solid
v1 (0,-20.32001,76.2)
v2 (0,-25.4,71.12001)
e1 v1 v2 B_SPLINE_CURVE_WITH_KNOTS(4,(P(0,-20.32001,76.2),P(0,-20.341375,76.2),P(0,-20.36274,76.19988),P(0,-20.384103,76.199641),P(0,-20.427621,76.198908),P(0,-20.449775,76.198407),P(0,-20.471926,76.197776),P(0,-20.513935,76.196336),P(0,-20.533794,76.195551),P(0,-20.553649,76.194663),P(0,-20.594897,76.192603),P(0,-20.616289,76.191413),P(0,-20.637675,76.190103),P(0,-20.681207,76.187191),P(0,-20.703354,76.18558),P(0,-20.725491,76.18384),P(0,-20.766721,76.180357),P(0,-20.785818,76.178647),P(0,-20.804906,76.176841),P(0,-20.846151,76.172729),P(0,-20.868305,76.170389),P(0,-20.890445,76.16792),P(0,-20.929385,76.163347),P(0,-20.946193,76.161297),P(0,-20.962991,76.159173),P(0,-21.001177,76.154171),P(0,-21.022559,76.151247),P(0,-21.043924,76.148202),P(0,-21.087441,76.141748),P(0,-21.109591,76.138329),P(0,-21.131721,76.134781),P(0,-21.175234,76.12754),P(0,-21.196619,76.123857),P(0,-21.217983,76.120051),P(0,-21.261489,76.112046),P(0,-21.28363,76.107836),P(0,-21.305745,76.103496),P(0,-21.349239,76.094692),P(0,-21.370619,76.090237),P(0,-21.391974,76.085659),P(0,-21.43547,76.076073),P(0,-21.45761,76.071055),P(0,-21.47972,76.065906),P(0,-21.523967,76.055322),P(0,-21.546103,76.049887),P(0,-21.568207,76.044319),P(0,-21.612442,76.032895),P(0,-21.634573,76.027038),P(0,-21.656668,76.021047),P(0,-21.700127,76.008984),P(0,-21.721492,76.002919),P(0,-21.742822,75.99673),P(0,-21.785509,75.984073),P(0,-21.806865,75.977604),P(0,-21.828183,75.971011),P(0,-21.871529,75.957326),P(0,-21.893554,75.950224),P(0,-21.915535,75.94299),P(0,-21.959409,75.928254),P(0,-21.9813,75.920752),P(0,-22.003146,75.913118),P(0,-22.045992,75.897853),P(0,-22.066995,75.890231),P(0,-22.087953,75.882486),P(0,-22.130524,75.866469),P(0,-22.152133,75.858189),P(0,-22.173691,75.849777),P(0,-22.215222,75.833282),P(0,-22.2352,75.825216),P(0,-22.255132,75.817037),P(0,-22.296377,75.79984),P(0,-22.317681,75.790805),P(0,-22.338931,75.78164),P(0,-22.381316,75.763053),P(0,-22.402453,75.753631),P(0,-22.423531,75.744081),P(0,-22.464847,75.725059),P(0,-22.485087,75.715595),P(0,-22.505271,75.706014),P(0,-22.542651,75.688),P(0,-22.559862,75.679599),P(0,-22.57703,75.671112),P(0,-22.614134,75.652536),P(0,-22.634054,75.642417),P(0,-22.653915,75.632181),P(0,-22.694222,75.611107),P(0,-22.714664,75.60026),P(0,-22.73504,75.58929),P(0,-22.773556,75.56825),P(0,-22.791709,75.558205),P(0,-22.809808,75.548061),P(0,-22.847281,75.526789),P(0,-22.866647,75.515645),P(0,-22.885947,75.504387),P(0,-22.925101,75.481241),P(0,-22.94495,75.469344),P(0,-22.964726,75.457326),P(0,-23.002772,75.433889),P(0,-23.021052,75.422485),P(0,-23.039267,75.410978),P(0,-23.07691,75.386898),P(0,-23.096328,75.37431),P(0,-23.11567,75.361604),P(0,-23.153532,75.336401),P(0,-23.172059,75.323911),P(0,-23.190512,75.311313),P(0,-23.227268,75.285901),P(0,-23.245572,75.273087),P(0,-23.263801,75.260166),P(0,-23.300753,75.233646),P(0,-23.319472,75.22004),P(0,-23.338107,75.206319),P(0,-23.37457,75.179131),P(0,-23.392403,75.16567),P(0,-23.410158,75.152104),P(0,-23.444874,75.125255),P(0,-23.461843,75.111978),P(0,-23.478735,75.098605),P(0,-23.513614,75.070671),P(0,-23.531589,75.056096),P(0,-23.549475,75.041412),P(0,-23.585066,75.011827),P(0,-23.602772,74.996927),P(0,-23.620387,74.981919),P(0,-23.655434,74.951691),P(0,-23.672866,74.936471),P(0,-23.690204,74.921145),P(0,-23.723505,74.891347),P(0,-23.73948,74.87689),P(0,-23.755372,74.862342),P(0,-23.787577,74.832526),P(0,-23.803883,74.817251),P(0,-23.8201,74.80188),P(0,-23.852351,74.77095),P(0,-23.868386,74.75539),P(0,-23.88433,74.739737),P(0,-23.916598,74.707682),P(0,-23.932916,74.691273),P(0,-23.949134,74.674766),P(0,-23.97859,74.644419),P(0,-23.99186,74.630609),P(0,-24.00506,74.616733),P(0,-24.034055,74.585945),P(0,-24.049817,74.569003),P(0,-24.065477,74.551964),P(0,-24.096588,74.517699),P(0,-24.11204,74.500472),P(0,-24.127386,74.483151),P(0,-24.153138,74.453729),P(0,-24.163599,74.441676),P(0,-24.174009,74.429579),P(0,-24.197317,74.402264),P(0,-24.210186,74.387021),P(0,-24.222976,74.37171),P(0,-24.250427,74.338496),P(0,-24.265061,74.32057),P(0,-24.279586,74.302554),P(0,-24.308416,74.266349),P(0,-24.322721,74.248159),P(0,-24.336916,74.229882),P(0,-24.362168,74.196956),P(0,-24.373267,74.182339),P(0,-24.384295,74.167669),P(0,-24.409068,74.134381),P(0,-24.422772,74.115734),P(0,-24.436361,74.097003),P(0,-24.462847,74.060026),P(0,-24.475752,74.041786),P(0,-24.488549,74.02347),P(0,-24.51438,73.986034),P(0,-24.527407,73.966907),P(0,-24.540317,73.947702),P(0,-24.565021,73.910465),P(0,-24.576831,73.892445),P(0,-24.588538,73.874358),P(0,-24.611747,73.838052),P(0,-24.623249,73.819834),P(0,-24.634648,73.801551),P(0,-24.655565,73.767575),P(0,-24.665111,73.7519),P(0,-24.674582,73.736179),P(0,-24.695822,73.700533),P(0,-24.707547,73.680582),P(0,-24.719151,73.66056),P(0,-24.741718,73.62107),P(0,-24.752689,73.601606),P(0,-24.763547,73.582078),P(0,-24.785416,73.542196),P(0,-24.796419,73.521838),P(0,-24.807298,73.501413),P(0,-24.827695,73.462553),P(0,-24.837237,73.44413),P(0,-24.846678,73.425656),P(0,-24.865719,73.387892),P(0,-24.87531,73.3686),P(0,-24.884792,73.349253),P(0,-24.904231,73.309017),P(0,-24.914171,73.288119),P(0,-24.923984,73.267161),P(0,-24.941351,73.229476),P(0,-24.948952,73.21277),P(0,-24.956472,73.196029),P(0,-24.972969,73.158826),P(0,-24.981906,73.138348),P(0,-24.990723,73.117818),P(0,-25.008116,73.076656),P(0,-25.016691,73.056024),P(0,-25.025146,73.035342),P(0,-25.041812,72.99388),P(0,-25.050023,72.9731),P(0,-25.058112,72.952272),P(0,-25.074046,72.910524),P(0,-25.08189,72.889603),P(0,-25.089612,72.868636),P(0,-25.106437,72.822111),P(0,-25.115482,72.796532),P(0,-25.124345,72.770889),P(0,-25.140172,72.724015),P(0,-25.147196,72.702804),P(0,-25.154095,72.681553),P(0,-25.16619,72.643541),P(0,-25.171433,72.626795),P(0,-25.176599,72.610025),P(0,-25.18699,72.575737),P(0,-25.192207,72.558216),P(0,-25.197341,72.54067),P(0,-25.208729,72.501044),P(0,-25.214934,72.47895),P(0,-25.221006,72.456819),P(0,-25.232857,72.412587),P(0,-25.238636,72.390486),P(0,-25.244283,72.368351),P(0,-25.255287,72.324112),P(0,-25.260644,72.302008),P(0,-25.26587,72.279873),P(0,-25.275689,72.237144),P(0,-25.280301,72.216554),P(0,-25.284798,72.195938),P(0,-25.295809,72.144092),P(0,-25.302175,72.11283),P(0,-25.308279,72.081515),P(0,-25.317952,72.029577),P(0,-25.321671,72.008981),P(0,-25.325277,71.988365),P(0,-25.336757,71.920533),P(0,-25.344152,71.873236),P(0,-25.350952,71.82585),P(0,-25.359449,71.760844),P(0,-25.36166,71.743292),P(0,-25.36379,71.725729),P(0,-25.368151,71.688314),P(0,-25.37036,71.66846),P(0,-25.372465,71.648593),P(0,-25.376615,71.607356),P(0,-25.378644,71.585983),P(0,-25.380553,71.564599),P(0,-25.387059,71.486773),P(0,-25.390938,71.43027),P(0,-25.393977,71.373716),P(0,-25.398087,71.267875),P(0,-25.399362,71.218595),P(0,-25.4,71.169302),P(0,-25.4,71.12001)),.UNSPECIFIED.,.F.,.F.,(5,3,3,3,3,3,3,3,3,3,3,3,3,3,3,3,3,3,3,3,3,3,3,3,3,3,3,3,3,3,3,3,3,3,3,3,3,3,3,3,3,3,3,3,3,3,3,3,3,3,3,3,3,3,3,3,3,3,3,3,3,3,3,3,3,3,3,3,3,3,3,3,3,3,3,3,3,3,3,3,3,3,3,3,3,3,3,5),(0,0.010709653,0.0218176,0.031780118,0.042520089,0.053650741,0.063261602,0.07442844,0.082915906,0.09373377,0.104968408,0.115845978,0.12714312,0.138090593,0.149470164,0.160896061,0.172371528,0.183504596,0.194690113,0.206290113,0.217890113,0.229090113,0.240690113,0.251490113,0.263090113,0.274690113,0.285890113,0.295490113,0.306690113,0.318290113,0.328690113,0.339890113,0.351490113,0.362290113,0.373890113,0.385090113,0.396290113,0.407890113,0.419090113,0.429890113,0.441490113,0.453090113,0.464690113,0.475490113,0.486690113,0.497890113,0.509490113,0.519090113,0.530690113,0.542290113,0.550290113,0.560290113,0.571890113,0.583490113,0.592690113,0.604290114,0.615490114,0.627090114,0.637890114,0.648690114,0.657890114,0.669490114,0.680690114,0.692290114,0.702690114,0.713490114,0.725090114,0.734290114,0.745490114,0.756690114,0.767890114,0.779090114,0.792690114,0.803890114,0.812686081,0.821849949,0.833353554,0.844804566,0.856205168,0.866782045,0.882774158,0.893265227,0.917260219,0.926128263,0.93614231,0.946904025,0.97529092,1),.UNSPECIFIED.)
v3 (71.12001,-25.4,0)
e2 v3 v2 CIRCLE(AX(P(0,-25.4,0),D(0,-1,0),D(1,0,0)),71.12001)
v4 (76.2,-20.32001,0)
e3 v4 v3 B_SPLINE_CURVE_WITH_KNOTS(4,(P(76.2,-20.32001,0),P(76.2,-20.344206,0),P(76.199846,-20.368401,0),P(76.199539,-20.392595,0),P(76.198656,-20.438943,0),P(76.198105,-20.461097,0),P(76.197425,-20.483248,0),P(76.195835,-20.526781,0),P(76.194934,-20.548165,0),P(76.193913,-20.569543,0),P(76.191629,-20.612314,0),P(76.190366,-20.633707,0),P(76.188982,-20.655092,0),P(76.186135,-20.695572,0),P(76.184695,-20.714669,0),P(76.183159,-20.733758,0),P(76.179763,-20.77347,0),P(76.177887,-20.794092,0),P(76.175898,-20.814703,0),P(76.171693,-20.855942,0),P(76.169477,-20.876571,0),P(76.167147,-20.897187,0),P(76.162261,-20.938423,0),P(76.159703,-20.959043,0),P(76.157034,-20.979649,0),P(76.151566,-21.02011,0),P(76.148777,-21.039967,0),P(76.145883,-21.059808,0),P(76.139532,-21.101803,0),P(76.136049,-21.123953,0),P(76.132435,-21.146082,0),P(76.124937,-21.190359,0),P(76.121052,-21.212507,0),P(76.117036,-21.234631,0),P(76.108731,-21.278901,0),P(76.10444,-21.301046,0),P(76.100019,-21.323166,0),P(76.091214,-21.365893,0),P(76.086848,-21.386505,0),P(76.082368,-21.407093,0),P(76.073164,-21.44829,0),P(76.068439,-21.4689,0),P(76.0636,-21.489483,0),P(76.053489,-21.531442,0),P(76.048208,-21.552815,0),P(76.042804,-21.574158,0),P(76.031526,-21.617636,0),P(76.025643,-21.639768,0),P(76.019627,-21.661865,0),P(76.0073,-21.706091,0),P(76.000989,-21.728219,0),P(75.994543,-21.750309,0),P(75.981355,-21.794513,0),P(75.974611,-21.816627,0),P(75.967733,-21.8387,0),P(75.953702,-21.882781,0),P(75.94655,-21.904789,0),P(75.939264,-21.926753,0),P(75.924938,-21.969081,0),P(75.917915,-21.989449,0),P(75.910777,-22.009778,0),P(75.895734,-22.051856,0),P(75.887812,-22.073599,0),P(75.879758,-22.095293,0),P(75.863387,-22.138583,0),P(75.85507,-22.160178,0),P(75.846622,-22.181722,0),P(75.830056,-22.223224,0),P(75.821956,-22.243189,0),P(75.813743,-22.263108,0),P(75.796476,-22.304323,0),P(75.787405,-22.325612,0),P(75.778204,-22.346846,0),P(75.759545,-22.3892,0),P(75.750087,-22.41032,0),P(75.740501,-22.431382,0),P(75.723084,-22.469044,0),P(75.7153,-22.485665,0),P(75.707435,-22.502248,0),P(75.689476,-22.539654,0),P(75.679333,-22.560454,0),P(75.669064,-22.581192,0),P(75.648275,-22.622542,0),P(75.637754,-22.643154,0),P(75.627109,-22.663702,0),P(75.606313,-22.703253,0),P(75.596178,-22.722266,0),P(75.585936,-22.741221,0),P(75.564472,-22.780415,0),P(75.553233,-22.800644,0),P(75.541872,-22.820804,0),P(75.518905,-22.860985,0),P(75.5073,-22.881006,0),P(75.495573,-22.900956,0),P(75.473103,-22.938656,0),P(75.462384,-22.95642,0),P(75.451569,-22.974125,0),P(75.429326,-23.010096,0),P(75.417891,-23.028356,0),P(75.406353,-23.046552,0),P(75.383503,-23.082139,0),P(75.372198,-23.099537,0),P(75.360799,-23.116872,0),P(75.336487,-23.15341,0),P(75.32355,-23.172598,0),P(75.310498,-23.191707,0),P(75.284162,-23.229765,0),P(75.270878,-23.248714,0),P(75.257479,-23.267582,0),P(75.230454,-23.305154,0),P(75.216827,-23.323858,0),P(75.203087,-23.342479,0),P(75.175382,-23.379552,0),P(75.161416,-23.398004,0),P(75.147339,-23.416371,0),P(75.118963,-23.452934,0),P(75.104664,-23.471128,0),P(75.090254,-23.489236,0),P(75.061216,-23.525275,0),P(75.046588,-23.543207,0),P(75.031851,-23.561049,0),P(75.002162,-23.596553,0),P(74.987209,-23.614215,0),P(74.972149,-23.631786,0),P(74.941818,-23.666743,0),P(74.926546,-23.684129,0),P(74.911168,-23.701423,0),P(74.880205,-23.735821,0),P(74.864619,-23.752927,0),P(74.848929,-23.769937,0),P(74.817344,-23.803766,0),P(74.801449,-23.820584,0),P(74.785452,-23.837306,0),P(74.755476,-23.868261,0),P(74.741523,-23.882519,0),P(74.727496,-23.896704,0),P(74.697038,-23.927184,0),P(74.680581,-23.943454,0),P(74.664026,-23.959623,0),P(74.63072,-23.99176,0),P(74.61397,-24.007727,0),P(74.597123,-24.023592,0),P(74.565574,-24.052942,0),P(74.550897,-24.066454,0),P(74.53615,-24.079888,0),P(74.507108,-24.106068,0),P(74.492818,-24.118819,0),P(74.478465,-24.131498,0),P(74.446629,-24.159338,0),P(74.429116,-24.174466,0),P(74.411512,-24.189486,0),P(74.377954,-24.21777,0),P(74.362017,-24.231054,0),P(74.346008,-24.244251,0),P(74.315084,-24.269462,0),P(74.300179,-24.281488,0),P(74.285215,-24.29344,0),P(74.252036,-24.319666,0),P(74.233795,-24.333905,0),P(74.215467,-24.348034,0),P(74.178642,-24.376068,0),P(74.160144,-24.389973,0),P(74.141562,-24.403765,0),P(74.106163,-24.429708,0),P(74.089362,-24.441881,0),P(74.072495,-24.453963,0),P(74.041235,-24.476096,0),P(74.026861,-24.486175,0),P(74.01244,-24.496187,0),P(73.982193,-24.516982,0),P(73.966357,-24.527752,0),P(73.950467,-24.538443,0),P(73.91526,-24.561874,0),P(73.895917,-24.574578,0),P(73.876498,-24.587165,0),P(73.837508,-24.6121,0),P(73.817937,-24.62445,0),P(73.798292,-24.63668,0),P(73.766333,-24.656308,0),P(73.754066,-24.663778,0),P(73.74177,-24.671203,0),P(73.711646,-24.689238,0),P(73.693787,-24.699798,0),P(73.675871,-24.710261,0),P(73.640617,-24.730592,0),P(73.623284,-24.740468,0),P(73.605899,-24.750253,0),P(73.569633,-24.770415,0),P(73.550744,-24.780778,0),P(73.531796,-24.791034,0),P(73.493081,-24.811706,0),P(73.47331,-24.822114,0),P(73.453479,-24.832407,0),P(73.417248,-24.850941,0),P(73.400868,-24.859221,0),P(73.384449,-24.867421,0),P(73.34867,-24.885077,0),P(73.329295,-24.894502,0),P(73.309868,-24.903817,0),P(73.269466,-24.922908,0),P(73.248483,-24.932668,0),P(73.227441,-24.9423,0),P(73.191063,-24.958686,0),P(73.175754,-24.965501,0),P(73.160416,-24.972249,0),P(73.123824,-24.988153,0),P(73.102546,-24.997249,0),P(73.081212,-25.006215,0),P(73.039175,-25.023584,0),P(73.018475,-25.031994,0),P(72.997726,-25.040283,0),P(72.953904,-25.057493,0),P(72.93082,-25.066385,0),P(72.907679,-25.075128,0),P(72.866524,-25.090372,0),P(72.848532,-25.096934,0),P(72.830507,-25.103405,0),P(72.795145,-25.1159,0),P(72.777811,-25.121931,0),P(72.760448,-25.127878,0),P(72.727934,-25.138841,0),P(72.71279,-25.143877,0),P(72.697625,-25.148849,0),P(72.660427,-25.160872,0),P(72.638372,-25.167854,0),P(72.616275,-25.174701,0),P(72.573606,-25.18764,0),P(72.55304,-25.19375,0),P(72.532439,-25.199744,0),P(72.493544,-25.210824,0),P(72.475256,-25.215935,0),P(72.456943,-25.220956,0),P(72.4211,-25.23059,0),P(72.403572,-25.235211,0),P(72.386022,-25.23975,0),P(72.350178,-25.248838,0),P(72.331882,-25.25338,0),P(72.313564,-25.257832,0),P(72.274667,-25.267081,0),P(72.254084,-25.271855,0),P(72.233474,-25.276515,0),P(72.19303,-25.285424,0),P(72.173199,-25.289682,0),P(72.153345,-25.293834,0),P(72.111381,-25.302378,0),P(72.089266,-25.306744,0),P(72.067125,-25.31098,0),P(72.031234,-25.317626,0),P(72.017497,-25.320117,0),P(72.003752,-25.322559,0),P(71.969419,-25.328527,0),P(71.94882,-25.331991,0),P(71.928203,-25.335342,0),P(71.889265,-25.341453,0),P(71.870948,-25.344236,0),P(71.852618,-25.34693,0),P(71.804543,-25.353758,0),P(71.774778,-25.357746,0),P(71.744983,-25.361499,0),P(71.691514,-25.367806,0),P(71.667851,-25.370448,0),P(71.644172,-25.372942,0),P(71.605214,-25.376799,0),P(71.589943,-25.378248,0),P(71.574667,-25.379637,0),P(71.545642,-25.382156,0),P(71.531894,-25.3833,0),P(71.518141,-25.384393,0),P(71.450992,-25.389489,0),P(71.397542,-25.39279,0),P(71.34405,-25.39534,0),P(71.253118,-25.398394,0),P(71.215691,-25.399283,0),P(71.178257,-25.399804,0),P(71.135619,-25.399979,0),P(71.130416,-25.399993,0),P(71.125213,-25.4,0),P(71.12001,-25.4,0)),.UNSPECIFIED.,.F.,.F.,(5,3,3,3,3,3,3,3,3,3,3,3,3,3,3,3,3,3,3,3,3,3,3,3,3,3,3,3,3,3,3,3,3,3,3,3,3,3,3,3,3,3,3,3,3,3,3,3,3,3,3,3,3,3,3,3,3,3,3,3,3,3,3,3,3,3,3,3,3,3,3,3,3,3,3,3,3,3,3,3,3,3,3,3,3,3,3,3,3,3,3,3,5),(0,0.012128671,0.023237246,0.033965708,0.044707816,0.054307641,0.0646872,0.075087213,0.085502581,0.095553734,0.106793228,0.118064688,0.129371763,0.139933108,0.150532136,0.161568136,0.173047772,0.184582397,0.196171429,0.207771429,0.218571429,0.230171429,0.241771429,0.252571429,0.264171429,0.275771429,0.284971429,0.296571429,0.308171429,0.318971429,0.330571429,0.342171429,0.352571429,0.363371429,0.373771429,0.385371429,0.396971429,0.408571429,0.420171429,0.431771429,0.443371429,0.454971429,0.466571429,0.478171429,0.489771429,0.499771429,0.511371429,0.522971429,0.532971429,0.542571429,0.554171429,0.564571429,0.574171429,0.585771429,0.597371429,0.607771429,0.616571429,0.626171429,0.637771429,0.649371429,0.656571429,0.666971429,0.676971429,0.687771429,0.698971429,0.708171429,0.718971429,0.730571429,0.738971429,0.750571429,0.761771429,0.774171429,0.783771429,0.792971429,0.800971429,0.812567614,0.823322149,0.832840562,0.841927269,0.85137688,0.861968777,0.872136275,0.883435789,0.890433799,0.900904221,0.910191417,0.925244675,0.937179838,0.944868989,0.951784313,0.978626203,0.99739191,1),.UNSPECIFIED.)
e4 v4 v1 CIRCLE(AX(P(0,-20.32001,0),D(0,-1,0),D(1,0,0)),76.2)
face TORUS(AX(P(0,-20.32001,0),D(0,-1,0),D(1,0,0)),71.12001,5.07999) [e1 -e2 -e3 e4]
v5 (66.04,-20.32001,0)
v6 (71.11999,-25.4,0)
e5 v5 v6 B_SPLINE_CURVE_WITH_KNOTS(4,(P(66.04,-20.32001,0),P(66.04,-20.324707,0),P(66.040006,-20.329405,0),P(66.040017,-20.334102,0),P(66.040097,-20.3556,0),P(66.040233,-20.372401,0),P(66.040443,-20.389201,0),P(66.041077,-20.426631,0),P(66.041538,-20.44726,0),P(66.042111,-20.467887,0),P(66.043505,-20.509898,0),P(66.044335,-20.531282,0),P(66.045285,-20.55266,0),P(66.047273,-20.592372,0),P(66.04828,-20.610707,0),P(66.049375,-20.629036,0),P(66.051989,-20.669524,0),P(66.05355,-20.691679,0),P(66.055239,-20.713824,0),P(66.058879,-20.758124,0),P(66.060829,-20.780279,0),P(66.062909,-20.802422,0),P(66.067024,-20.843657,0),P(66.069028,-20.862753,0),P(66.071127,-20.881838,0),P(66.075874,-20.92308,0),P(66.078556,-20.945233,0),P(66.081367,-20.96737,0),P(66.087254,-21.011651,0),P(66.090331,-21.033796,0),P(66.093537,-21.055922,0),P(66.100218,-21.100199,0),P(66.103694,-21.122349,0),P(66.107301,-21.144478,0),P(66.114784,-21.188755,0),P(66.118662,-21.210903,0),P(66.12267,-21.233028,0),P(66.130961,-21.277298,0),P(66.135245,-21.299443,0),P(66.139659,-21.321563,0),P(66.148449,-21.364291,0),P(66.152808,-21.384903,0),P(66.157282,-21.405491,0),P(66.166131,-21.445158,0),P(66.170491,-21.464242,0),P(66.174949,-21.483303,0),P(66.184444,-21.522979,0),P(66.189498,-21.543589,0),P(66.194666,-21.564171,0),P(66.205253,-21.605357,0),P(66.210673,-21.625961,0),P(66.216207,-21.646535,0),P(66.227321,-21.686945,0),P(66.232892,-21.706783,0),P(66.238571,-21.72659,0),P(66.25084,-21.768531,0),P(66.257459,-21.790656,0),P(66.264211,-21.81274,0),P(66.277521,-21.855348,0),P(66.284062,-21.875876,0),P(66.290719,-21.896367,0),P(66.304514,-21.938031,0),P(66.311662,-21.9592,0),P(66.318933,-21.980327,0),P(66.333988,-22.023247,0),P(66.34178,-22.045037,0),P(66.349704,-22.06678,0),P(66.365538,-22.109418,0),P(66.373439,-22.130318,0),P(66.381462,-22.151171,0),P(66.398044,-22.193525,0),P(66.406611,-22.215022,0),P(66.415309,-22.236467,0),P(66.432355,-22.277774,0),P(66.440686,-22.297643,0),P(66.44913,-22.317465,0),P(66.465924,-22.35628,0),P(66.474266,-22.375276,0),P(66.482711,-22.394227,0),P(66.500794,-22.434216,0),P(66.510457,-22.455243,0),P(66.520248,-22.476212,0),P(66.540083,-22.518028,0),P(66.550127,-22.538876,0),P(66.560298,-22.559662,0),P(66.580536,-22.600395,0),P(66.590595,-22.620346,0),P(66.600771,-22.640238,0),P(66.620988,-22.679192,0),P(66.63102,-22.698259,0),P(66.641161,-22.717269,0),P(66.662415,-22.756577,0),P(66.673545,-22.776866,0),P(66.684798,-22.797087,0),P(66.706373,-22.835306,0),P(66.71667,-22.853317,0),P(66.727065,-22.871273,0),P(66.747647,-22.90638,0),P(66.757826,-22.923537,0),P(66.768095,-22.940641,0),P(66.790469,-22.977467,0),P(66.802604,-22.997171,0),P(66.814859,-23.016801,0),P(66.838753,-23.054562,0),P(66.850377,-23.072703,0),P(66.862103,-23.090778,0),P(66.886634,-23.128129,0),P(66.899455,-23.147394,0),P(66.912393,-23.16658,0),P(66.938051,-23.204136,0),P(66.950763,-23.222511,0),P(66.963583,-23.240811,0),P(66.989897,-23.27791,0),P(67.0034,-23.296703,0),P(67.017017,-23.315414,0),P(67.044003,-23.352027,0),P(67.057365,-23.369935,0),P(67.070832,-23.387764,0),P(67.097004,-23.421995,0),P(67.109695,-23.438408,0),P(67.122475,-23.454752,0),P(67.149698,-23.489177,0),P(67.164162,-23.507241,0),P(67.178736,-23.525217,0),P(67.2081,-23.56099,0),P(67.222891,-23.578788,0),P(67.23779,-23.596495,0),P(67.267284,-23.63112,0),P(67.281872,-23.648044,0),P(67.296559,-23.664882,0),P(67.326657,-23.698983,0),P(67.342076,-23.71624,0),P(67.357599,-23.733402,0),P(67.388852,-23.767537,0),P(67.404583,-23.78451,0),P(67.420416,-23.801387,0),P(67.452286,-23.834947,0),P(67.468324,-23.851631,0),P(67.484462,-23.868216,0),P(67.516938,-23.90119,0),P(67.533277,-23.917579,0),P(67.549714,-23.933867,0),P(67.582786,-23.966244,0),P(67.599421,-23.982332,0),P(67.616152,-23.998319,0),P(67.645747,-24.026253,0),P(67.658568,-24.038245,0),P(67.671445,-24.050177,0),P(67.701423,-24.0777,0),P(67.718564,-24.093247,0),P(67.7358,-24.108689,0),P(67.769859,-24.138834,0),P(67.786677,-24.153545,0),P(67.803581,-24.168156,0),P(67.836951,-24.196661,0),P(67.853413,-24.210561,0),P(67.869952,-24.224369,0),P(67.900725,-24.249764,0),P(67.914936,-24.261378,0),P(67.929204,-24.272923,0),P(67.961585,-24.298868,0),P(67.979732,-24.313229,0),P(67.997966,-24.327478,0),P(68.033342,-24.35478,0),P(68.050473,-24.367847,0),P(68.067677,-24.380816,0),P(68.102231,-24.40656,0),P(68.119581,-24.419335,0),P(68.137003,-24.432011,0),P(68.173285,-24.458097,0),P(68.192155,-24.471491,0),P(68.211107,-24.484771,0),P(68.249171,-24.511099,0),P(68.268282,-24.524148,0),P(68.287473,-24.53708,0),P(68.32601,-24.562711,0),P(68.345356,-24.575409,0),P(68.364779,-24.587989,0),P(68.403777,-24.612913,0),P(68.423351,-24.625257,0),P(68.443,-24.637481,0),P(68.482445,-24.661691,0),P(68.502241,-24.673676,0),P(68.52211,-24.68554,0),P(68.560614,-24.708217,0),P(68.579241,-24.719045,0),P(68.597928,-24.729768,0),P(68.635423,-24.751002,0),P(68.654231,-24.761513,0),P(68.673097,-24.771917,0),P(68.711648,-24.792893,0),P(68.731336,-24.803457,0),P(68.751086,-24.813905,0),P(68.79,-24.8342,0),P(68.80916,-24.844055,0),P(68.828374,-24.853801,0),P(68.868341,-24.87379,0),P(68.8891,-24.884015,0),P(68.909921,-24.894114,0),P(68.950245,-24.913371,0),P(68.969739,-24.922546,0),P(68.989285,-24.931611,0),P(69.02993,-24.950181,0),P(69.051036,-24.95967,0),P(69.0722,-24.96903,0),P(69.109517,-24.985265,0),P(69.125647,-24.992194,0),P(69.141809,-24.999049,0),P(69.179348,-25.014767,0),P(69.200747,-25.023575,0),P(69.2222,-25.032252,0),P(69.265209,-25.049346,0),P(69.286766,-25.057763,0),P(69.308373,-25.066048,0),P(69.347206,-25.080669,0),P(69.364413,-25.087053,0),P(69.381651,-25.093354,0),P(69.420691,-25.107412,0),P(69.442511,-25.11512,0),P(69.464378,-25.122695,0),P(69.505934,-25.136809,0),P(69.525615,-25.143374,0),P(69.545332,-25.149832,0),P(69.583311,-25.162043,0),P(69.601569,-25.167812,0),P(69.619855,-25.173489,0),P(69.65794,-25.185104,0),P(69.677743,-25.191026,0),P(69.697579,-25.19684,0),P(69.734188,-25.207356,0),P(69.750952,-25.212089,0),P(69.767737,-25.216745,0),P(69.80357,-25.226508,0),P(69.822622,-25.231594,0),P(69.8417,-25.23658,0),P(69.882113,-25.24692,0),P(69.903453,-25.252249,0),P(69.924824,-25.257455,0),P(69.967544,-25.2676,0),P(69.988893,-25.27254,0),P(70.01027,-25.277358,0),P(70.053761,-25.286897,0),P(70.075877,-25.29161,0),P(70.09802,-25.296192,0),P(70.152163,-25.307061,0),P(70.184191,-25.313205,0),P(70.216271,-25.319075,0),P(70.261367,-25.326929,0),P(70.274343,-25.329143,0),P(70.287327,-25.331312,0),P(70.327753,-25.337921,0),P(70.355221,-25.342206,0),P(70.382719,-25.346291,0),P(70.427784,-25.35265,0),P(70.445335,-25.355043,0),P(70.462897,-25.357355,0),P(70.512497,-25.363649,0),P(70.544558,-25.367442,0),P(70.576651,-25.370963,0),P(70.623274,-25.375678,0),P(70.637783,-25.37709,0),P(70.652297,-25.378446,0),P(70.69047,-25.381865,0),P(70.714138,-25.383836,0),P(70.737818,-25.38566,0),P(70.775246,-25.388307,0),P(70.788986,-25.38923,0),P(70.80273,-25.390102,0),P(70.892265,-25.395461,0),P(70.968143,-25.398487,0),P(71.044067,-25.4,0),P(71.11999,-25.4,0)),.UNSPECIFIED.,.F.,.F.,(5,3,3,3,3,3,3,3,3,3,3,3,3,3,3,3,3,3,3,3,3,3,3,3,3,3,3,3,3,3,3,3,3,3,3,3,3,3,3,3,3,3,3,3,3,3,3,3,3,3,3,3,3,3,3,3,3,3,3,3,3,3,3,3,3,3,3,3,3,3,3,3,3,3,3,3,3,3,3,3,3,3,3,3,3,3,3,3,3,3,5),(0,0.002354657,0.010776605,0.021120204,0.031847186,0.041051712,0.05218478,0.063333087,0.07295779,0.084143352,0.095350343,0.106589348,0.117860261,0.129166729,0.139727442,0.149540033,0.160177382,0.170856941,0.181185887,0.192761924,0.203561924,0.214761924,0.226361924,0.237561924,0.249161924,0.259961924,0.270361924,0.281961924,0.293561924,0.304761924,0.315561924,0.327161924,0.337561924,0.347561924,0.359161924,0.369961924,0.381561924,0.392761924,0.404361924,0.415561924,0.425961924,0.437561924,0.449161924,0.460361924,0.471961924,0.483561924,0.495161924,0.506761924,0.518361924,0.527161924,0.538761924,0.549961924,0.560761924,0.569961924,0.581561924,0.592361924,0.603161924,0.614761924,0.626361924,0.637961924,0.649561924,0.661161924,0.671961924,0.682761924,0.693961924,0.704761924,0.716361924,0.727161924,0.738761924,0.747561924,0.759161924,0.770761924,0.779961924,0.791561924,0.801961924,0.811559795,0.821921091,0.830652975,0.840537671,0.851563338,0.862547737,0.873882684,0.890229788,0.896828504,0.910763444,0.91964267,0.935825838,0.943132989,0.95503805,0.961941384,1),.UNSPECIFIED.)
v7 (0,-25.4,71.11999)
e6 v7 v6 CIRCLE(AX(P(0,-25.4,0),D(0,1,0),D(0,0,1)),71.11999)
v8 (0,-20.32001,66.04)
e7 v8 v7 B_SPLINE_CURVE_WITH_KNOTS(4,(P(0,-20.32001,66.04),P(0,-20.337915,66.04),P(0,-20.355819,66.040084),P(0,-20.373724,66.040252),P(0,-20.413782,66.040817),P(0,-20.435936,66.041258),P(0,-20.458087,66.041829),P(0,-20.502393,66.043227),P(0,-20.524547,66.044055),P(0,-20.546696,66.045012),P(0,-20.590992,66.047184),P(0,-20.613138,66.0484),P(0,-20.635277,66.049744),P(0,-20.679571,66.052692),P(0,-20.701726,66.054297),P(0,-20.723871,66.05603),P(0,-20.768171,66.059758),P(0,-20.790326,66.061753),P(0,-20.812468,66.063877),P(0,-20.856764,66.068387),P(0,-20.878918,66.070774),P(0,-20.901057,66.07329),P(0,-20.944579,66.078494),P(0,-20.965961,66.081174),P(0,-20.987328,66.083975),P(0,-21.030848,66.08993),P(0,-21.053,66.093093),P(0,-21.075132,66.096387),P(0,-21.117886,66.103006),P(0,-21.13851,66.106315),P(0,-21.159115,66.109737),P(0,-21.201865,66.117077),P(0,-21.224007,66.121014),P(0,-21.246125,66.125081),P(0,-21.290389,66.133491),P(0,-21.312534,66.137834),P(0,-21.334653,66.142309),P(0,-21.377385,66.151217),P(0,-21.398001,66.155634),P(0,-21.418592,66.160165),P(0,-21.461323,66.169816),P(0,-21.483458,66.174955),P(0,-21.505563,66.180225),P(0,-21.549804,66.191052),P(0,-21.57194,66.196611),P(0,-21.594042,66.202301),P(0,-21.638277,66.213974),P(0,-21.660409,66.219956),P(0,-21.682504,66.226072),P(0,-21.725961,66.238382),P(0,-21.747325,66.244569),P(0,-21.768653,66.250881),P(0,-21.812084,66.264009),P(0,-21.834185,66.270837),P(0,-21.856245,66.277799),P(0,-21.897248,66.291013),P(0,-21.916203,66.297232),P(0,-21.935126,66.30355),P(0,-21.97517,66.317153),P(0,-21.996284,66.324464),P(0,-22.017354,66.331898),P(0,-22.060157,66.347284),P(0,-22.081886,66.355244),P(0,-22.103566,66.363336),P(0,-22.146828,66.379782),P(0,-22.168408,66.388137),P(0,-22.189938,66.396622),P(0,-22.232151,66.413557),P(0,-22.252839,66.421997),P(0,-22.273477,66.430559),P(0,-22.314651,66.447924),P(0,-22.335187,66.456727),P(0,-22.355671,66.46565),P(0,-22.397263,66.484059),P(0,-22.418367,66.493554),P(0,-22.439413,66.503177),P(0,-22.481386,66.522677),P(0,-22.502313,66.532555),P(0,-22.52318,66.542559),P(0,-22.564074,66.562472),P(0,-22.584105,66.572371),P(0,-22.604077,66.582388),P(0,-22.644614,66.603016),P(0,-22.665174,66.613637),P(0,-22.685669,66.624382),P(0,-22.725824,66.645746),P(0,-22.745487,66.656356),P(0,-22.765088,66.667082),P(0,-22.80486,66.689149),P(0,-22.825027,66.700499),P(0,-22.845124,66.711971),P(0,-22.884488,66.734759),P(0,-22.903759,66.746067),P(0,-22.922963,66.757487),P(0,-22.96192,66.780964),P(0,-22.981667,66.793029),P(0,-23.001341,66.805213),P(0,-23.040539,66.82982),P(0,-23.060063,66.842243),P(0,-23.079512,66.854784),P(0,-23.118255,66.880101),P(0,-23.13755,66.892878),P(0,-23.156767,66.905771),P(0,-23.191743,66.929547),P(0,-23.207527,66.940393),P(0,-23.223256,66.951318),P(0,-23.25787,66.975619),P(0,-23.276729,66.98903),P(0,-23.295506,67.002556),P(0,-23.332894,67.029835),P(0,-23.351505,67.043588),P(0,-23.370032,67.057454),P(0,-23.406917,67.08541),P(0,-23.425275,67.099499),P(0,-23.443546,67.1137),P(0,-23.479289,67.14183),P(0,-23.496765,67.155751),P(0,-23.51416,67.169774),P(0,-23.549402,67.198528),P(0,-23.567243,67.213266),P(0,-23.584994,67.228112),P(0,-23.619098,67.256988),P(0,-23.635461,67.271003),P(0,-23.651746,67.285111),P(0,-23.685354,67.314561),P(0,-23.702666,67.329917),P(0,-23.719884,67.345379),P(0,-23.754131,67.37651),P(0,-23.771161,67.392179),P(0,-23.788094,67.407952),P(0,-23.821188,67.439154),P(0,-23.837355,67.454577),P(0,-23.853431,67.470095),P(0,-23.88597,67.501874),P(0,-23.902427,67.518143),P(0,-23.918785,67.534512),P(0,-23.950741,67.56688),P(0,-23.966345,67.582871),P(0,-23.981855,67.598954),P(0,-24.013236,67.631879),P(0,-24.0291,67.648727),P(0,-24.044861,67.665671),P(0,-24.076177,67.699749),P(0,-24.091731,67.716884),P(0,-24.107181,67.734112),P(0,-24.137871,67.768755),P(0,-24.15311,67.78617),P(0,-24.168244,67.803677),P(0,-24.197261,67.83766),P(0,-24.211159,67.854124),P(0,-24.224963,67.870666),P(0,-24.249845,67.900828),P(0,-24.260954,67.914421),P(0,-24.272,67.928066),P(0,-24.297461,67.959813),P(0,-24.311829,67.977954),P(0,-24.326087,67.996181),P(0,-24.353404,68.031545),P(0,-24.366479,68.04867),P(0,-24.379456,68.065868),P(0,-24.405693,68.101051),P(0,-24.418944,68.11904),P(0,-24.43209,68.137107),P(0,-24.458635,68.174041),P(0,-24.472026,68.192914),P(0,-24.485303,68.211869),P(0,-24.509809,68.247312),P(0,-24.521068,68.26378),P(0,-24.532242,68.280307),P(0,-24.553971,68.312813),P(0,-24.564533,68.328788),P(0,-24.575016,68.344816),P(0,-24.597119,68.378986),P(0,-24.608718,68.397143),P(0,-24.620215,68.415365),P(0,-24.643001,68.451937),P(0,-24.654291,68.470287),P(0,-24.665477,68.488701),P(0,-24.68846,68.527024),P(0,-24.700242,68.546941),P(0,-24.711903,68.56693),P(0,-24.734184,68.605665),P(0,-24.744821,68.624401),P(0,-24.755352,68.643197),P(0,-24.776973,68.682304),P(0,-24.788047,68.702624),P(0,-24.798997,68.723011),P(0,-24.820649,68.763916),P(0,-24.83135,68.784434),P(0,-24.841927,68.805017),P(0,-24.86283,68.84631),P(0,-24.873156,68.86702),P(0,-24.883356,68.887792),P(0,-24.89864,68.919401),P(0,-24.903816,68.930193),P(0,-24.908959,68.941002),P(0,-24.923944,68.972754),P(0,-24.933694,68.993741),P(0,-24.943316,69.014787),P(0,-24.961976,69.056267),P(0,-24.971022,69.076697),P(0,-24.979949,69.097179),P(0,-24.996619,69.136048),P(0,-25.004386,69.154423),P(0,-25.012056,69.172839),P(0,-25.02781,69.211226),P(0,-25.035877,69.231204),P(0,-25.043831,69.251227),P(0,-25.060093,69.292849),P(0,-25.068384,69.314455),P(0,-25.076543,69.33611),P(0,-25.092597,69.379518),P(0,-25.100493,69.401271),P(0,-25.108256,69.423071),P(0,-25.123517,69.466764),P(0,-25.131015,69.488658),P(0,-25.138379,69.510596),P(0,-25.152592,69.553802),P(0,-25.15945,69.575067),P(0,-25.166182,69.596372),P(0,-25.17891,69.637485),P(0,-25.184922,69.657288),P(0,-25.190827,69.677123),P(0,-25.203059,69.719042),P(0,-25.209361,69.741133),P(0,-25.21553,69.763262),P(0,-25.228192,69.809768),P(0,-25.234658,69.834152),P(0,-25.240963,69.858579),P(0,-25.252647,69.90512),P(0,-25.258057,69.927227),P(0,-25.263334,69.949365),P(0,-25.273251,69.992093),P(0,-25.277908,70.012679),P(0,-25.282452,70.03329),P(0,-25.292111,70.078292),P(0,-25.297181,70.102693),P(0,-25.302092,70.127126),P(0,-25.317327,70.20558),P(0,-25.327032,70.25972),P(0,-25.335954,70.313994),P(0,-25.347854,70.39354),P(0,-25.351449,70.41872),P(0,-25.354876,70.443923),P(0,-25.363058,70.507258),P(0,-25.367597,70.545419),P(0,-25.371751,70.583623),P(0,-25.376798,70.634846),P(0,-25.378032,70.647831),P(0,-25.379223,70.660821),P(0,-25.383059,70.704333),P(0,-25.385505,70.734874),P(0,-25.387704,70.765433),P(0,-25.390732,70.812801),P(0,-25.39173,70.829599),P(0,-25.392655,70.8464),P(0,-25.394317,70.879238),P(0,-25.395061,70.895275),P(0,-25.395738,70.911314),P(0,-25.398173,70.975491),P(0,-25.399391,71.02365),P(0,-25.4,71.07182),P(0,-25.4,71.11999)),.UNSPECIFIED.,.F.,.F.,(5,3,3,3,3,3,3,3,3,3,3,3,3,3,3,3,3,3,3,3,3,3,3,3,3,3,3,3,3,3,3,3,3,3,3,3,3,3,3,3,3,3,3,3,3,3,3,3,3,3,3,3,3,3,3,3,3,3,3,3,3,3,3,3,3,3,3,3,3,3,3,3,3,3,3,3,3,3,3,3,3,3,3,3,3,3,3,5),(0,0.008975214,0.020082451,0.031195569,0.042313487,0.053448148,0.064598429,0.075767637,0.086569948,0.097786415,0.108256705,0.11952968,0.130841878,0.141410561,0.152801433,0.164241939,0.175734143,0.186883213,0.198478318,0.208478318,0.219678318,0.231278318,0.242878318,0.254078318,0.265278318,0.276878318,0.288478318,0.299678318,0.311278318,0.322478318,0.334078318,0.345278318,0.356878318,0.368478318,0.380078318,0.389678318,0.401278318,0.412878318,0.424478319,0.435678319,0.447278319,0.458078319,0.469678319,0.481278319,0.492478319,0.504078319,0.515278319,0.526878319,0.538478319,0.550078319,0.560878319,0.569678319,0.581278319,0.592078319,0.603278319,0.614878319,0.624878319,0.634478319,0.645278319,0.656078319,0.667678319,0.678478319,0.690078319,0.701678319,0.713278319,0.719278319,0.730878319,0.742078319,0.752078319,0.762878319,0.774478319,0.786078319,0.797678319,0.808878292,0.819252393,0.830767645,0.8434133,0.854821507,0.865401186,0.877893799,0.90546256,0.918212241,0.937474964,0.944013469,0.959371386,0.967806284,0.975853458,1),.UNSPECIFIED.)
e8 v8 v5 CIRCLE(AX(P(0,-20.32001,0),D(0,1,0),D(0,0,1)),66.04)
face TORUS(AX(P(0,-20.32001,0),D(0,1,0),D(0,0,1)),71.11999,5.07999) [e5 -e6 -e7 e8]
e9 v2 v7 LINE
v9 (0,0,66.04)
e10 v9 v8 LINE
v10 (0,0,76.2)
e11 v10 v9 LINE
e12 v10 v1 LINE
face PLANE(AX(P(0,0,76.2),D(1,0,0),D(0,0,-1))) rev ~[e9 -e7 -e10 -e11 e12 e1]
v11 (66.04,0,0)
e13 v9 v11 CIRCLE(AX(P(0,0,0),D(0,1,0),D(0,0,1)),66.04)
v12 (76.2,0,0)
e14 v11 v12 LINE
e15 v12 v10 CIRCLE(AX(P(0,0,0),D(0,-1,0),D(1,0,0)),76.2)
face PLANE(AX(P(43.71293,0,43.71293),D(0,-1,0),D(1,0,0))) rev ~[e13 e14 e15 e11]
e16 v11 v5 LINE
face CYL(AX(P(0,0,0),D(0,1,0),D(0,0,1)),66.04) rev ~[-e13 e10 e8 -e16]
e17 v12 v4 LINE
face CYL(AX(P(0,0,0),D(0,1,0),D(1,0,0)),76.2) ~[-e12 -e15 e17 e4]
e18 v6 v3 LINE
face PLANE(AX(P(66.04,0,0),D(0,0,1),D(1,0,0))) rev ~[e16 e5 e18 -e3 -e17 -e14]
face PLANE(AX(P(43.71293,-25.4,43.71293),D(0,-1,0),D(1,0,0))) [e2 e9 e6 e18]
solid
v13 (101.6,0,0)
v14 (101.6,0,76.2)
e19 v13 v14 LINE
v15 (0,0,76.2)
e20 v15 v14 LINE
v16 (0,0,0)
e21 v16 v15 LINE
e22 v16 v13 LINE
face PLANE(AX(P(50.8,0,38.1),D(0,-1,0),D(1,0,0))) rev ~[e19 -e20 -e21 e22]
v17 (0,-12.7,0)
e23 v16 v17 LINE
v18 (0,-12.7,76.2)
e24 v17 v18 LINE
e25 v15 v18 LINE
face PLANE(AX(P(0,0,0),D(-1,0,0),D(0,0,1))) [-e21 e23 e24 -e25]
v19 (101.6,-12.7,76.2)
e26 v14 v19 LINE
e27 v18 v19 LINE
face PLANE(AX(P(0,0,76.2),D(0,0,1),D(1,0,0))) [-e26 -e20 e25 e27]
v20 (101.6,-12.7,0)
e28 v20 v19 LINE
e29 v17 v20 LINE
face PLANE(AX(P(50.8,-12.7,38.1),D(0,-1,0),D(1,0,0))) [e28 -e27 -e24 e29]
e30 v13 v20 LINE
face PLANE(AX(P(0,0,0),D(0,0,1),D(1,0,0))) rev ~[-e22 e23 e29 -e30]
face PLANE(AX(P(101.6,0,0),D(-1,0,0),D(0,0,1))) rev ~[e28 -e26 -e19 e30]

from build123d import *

# Parameters (mm, degrees)
F0_W     = 101.6
F0_H     = 76.2
F1_DEPTH = 12.7
F3_DEPTH = 25.4
F4_R     = 5.07999


# Not quite as in the source:
# - a fillet or chamfer is up to 0.001 mm smaller than in the source, because OpenCascade refuses the exact size


with BuildPart() as f1:
    # F0 (on Front) → F1 (new body)
    with BuildSketch(Plane.XZ):
        with Locations((50.8, 38.1)):
            Rectangle(F0_W, F0_H)
    extrude(amount=F1_DEPTH)


with BuildPart() as f3:
    # F2 (on Front) → F3 (new body)
    with BuildSketch(Plane.XZ):
        with BuildLine():
            ThreePointArc((76.2, 0), (53.8815367264, 53.8815367264), (0, 76.2))
            Line((0, 76.2), (0, 66.04))
            ThreePointArc((0, 66.04), (46.6973318296, 46.6973318296), (66.04, 0))
            Line((66.04, 0), (76.2, 0))
        make_face()
    extrude(amount=F3_DEPTH)

    # F4 (radius 5.08 in the source; OpenCascade refuses exactly that, so slightly less here)
    f4_edges = [f3.edges().sort_by_distance(p)[0] for p in [
        (46.697332, -25.4, 46.697332),
        (53.881537, -25.4, 53.881537),
    ]]
    fillet(f4_edges, radius=F4_R)


solid = Compound([f1.part, f3.part])
